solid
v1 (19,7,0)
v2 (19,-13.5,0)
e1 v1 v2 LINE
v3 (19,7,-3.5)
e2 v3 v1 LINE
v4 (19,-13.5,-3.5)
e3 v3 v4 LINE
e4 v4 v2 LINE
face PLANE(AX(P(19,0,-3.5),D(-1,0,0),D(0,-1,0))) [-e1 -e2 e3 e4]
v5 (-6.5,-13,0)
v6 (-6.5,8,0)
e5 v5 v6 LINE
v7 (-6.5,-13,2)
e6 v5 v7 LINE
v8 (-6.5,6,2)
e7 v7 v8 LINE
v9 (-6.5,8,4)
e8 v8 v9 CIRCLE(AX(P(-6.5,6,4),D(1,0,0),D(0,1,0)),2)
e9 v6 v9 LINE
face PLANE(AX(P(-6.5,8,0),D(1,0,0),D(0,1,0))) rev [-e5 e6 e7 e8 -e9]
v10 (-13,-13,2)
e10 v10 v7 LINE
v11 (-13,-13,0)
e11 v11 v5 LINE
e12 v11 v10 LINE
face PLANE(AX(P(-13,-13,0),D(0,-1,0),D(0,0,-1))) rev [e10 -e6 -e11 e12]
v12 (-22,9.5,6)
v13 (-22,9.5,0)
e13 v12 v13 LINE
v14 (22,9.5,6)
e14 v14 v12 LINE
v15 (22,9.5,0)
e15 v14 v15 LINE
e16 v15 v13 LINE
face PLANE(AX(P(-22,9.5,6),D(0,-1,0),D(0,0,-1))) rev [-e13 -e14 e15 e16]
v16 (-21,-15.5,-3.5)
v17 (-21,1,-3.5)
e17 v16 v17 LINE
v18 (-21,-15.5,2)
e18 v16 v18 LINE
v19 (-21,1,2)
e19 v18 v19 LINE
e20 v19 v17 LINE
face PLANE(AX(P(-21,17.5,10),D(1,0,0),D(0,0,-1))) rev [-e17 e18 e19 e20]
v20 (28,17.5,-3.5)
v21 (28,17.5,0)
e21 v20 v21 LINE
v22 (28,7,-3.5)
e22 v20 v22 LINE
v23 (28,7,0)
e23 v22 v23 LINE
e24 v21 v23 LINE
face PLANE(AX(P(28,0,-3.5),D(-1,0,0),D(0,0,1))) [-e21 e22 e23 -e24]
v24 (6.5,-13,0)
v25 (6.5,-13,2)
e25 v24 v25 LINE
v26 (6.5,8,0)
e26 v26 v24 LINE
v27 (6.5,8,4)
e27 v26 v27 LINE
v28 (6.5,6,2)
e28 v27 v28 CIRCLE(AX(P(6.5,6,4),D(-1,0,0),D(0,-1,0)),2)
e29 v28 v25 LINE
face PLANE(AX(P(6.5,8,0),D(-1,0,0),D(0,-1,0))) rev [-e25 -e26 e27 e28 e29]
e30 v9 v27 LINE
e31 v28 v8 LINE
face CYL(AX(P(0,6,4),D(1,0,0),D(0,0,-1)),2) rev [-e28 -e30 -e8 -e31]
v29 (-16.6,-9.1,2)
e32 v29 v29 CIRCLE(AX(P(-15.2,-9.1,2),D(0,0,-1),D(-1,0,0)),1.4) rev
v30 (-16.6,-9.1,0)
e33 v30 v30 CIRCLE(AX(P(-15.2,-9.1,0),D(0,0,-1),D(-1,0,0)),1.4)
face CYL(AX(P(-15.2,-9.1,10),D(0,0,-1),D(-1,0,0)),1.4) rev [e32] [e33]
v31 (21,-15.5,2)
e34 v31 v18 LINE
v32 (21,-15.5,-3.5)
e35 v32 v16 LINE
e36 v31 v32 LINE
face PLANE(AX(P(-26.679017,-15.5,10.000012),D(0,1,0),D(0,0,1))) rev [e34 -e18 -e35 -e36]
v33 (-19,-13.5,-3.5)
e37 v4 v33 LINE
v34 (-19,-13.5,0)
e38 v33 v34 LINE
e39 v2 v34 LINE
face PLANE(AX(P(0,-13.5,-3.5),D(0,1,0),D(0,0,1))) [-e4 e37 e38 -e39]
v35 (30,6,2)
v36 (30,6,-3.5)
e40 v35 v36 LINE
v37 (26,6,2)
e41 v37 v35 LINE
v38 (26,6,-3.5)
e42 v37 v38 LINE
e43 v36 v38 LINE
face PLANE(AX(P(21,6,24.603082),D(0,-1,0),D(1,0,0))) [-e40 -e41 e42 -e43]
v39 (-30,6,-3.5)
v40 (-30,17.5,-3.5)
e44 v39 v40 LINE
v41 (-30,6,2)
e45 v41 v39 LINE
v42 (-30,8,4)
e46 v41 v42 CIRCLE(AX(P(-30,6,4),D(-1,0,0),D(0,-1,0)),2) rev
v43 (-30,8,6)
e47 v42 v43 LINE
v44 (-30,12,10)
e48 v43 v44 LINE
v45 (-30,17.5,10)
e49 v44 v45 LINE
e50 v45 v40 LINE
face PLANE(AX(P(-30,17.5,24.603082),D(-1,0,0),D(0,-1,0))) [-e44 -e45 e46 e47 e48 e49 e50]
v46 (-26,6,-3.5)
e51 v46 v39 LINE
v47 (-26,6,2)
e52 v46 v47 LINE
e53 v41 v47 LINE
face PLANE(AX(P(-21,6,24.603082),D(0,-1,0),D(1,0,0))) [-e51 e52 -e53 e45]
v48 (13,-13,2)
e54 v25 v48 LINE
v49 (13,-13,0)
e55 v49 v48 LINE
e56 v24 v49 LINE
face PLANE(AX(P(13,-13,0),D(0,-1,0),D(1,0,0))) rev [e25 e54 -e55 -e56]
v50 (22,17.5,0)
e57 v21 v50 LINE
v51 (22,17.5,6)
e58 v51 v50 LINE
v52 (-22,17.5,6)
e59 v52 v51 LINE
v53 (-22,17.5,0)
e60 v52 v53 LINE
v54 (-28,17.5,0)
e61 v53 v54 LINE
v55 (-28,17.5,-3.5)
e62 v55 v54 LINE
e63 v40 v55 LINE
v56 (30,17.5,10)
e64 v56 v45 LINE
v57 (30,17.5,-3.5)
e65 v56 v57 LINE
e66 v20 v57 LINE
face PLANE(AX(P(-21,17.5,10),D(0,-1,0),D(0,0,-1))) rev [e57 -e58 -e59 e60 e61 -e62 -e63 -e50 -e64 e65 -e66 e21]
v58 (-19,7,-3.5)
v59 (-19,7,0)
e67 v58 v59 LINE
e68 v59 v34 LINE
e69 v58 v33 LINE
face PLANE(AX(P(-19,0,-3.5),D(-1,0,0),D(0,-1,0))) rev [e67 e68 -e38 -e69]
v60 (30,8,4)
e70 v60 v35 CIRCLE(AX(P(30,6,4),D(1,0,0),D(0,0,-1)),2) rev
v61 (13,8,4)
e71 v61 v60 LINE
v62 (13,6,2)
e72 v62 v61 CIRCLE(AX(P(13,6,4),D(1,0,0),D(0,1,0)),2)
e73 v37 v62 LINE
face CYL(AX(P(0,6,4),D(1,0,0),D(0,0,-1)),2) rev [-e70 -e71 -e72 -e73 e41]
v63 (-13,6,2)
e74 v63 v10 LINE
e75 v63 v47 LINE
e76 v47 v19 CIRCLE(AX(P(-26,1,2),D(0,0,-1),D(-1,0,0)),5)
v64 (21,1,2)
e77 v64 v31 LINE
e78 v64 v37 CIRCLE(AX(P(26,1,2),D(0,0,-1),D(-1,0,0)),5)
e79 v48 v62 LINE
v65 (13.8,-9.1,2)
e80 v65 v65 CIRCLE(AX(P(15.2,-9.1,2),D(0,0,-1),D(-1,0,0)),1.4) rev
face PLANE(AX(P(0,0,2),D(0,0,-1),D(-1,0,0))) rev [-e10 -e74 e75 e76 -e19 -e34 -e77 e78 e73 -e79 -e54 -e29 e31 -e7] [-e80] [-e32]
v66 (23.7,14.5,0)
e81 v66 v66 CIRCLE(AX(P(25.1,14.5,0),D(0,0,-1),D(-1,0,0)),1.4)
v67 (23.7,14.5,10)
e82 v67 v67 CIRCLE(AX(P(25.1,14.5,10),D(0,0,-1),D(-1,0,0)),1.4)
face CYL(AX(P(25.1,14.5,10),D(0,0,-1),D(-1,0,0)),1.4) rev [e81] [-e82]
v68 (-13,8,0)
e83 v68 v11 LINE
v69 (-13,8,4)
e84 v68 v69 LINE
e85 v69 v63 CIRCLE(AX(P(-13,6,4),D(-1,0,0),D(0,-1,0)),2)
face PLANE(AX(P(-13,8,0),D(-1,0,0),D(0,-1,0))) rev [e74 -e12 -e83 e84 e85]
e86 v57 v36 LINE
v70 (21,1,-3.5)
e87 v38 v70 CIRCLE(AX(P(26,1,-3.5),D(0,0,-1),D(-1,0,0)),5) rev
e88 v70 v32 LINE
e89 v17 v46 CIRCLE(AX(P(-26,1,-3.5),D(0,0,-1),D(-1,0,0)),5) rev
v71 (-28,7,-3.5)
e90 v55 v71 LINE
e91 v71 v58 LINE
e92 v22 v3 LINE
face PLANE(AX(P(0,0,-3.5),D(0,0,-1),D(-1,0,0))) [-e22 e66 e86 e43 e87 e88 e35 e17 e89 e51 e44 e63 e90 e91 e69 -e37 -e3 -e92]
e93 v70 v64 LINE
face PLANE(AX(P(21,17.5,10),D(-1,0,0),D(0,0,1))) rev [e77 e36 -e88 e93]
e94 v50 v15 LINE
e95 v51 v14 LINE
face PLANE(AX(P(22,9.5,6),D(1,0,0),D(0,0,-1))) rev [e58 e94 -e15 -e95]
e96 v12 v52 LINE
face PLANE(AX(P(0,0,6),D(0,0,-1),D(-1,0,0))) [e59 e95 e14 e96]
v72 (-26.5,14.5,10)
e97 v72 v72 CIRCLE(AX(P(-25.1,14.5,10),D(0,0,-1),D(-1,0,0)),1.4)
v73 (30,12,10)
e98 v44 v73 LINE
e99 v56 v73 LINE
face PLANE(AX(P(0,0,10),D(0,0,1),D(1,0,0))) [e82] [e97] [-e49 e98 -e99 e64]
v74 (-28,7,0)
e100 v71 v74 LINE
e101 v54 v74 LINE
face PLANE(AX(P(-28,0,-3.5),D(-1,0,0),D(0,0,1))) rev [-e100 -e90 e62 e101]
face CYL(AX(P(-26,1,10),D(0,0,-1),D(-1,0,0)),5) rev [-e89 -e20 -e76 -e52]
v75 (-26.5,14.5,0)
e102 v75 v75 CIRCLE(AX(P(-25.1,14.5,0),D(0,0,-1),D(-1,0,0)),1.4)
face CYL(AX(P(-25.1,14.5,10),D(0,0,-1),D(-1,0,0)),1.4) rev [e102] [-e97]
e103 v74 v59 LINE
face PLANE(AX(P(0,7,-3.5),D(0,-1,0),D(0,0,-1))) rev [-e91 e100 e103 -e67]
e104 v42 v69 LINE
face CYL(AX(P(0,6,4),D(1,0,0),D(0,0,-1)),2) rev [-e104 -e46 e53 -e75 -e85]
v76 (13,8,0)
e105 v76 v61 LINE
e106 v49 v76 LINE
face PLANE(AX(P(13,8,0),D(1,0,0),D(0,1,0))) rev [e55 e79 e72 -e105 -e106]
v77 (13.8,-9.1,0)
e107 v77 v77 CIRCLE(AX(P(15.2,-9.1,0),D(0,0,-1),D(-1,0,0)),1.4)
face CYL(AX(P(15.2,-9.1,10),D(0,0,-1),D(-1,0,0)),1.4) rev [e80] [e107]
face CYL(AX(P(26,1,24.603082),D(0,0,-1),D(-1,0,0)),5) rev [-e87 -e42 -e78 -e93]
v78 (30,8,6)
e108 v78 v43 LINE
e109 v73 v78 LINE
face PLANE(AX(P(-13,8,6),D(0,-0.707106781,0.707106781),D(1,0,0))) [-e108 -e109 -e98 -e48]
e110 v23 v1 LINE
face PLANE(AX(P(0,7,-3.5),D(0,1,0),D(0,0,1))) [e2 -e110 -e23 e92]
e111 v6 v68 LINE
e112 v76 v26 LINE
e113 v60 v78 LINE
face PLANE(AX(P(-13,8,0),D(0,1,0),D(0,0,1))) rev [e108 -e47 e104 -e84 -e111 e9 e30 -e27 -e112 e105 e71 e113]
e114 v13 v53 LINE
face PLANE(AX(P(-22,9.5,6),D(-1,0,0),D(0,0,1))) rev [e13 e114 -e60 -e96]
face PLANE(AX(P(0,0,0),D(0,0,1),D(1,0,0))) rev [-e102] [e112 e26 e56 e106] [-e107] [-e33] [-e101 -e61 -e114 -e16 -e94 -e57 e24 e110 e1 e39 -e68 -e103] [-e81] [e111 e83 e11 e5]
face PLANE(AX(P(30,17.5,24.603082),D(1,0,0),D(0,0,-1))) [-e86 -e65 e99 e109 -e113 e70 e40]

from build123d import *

# Parameters (mm, degrees)
SKETCH_1_W                 = 42
SKETCH_1_H                 = 35
EXTRUDE_1_DEPTH            = 10
SKETCH_2_W                 = 6.5
SKETCH_2_H                 = 21
CUT_EXTRUDE_1_DEPTH        = 10
SKETCH_5_W                 = 9
SKETCH_5_H                 = 11.5
EXTRUDE_2_DEPTH            = 10
SKETCH_6_R                 = 1.4
CUT_EXTRUDE_4_DEPTH        = 10
SKETCH_3_W                 = 44
SKETCH_3_H                 = 8
CUT_EXTRUDE_2_DEPTH        = 6
CUT_EXTRUDE_1_2_DEPTH      = 37.142080737
CUT_EXTRUDE_1_2_DEPTH_BACK = 10
SKETCH_8_W                 = 59.417014287
SKETCH_8_H                 = 10
EXTRUDE_3_DEPTH            = 3.5
SKETCH_12_W                = 60
SKETCH_12_H                = 23.5
CUT_EXTRUDE_5_DEPTH        = 8
FILLET_1_R                 = 5
FILLET_3_R                 = 2
CHAMFER_1_SIZE             = 4


with BuildPart() as part:
    # 草图1 → 凸台-拉伸1 (new body)
    with BuildSketch(Plane.XY):
        Rectangle(SKETCH_1_W, SKETCH_1_H)
    extrude(amount=EXTRUDE_1_DEPTH)

    # 草图2 → Cut-Extrude 1 (cut)
    with BuildSketch(Plane.XY.offset(10)):
        with Locations((-9.75, -2.5)):
            Rectangle(SKETCH_2_W, SKETCH_2_H)
        with Locations((9.75, -2.5)):
            Rectangle(SKETCH_2_W, SKETCH_2_H)
    extrude(amount=-CUT_EXTRUDE_1_DEPTH, mode=Mode.SUBTRACT)

    # 草图5 → 凸台-拉伸2 (add)
    with BuildSketch(Plane(origin=(0, 0, 0), x_dir=(-1, 0, 0), z_dir=(0, 0, -1))):
        with Locations((-25.5, 11.75)):
            Rectangle(SKETCH_5_W, SKETCH_5_H)
        with Locations((25.5, 11.75)):
            Rectangle(SKETCH_5_W, SKETCH_5_H)
    extrude(amount=-EXTRUDE_2_DEPTH)

    # 草图6 → 切除-拉伸4 (cut)
    with BuildSketch(Plane(origin=(0, 0, 0), x_dir=(-1, 0, 0), z_dir=(0, 0, -1))):
        with Locations((-25.1, 14.5)):
            Circle(SKETCH_6_R)
        with Locations((25.1, 14.5)):
            Circle(SKETCH_6_R)
        with Locations((-15.2, -9.1)):
            Circle(SKETCH_6_R)
        with Locations((15.2, -9.1)):
            Circle(SKETCH_6_R)
    extrude(amount=-CUT_EXTRUDE_4_DEPTH, mode=Mode.SUBTRACT)

    # 草图3 → 切除-拉伸2 (cut)
    with BuildSketch(Plane(origin=(0, 0, 0), x_dir=(-1, 0, 0), z_dir=(0, 0, -1))):
        with Locations((0, 13.5)):
            Rectangle(SKETCH_3_W, SKETCH_3_H)
    extrude(amount=-CUT_EXTRUDE_2_DEPTH, mode=Mode.SUBTRACT)

    # 草图8 → Cut-Extrude 1 2 (cut, two sides: drawn at the far end of the back side and taken through both)
    with BuildSketch(Plane.XY.offset(10).offset(-CUT_EXTRUDE_1_2_DEPTH_BACK)):
        with Locations((3.029489766, -20.5)):
            Rectangle(SKETCH_8_W, SKETCH_8_H)
    extrude(amount=CUT_EXTRUDE_1_2_DEPTH + CUT_EXTRUDE_1_2_DEPTH_BACK, mode=Mode.SUBTRACT)

    # 草图10 → 凸台-拉伸3 (add)
    with BuildSketch(Plane(origin=(0, 0, 0), x_dir=(-1, 0, 0), z_dir=(0, 0, -1))):
        Polygon((-28, 17.5), (-30, 17.5), (-30, 6), (-21, 6), (-21, -15.5), (0, -15.5), (0, -13.5), (-19, -13.5), (-19, 7), (-28, 7), align=None)
        Polygon((0, -13.5), (0, -15.5), (21, -15.5), (21, 6), (30, 6), (30, 17.5), (28, 17.5), (28, 7), (19, 7), (19, -13.5), align=None)
    extrude(amount=EXTRUDE_3_DEPTH)

    # 草图12 → 切除-拉伸5 (cut)
    with BuildSketch(Plane.XY.offset(10)):
        with Locations((0, -3.75)):
            Rectangle(SKETCH_12_W, SKETCH_12_H)
    extrude(amount=-CUT_EXTRUDE_5_DEPTH, mode=Mode.SUBTRACT)

    # 圆角1
    fillet_1_edges = [part.edges().sort_by_distance(p)[0] for p in [
        (-21, 6, -0.75),
        (21, 6, -0.75),
    ]]
    fillet(fillet_1_edges, radius=FILLET_1_R)

    # 圆角3
    fillet_3_edges = [part.edges().sort_by_distance(p)[0] for p in [
        (21.5, 8, 2),
        (-21.5, 8, 2),
        (0, 8, 2),
    ]]
    fillet(fillet_3_edges, radius=FILLET_3_R - 0.0001)  # a hair under: the kernel refuses the full size

    # 倒角1
    chamfer_1_edges = [part.edges().sort_by_distance(p)[0] for p in [
        (0, 8, 10),
    ]]
    chamfer(chamfer_1_edges, length=CHAMFER_1_SIZE)


solid = part.part
